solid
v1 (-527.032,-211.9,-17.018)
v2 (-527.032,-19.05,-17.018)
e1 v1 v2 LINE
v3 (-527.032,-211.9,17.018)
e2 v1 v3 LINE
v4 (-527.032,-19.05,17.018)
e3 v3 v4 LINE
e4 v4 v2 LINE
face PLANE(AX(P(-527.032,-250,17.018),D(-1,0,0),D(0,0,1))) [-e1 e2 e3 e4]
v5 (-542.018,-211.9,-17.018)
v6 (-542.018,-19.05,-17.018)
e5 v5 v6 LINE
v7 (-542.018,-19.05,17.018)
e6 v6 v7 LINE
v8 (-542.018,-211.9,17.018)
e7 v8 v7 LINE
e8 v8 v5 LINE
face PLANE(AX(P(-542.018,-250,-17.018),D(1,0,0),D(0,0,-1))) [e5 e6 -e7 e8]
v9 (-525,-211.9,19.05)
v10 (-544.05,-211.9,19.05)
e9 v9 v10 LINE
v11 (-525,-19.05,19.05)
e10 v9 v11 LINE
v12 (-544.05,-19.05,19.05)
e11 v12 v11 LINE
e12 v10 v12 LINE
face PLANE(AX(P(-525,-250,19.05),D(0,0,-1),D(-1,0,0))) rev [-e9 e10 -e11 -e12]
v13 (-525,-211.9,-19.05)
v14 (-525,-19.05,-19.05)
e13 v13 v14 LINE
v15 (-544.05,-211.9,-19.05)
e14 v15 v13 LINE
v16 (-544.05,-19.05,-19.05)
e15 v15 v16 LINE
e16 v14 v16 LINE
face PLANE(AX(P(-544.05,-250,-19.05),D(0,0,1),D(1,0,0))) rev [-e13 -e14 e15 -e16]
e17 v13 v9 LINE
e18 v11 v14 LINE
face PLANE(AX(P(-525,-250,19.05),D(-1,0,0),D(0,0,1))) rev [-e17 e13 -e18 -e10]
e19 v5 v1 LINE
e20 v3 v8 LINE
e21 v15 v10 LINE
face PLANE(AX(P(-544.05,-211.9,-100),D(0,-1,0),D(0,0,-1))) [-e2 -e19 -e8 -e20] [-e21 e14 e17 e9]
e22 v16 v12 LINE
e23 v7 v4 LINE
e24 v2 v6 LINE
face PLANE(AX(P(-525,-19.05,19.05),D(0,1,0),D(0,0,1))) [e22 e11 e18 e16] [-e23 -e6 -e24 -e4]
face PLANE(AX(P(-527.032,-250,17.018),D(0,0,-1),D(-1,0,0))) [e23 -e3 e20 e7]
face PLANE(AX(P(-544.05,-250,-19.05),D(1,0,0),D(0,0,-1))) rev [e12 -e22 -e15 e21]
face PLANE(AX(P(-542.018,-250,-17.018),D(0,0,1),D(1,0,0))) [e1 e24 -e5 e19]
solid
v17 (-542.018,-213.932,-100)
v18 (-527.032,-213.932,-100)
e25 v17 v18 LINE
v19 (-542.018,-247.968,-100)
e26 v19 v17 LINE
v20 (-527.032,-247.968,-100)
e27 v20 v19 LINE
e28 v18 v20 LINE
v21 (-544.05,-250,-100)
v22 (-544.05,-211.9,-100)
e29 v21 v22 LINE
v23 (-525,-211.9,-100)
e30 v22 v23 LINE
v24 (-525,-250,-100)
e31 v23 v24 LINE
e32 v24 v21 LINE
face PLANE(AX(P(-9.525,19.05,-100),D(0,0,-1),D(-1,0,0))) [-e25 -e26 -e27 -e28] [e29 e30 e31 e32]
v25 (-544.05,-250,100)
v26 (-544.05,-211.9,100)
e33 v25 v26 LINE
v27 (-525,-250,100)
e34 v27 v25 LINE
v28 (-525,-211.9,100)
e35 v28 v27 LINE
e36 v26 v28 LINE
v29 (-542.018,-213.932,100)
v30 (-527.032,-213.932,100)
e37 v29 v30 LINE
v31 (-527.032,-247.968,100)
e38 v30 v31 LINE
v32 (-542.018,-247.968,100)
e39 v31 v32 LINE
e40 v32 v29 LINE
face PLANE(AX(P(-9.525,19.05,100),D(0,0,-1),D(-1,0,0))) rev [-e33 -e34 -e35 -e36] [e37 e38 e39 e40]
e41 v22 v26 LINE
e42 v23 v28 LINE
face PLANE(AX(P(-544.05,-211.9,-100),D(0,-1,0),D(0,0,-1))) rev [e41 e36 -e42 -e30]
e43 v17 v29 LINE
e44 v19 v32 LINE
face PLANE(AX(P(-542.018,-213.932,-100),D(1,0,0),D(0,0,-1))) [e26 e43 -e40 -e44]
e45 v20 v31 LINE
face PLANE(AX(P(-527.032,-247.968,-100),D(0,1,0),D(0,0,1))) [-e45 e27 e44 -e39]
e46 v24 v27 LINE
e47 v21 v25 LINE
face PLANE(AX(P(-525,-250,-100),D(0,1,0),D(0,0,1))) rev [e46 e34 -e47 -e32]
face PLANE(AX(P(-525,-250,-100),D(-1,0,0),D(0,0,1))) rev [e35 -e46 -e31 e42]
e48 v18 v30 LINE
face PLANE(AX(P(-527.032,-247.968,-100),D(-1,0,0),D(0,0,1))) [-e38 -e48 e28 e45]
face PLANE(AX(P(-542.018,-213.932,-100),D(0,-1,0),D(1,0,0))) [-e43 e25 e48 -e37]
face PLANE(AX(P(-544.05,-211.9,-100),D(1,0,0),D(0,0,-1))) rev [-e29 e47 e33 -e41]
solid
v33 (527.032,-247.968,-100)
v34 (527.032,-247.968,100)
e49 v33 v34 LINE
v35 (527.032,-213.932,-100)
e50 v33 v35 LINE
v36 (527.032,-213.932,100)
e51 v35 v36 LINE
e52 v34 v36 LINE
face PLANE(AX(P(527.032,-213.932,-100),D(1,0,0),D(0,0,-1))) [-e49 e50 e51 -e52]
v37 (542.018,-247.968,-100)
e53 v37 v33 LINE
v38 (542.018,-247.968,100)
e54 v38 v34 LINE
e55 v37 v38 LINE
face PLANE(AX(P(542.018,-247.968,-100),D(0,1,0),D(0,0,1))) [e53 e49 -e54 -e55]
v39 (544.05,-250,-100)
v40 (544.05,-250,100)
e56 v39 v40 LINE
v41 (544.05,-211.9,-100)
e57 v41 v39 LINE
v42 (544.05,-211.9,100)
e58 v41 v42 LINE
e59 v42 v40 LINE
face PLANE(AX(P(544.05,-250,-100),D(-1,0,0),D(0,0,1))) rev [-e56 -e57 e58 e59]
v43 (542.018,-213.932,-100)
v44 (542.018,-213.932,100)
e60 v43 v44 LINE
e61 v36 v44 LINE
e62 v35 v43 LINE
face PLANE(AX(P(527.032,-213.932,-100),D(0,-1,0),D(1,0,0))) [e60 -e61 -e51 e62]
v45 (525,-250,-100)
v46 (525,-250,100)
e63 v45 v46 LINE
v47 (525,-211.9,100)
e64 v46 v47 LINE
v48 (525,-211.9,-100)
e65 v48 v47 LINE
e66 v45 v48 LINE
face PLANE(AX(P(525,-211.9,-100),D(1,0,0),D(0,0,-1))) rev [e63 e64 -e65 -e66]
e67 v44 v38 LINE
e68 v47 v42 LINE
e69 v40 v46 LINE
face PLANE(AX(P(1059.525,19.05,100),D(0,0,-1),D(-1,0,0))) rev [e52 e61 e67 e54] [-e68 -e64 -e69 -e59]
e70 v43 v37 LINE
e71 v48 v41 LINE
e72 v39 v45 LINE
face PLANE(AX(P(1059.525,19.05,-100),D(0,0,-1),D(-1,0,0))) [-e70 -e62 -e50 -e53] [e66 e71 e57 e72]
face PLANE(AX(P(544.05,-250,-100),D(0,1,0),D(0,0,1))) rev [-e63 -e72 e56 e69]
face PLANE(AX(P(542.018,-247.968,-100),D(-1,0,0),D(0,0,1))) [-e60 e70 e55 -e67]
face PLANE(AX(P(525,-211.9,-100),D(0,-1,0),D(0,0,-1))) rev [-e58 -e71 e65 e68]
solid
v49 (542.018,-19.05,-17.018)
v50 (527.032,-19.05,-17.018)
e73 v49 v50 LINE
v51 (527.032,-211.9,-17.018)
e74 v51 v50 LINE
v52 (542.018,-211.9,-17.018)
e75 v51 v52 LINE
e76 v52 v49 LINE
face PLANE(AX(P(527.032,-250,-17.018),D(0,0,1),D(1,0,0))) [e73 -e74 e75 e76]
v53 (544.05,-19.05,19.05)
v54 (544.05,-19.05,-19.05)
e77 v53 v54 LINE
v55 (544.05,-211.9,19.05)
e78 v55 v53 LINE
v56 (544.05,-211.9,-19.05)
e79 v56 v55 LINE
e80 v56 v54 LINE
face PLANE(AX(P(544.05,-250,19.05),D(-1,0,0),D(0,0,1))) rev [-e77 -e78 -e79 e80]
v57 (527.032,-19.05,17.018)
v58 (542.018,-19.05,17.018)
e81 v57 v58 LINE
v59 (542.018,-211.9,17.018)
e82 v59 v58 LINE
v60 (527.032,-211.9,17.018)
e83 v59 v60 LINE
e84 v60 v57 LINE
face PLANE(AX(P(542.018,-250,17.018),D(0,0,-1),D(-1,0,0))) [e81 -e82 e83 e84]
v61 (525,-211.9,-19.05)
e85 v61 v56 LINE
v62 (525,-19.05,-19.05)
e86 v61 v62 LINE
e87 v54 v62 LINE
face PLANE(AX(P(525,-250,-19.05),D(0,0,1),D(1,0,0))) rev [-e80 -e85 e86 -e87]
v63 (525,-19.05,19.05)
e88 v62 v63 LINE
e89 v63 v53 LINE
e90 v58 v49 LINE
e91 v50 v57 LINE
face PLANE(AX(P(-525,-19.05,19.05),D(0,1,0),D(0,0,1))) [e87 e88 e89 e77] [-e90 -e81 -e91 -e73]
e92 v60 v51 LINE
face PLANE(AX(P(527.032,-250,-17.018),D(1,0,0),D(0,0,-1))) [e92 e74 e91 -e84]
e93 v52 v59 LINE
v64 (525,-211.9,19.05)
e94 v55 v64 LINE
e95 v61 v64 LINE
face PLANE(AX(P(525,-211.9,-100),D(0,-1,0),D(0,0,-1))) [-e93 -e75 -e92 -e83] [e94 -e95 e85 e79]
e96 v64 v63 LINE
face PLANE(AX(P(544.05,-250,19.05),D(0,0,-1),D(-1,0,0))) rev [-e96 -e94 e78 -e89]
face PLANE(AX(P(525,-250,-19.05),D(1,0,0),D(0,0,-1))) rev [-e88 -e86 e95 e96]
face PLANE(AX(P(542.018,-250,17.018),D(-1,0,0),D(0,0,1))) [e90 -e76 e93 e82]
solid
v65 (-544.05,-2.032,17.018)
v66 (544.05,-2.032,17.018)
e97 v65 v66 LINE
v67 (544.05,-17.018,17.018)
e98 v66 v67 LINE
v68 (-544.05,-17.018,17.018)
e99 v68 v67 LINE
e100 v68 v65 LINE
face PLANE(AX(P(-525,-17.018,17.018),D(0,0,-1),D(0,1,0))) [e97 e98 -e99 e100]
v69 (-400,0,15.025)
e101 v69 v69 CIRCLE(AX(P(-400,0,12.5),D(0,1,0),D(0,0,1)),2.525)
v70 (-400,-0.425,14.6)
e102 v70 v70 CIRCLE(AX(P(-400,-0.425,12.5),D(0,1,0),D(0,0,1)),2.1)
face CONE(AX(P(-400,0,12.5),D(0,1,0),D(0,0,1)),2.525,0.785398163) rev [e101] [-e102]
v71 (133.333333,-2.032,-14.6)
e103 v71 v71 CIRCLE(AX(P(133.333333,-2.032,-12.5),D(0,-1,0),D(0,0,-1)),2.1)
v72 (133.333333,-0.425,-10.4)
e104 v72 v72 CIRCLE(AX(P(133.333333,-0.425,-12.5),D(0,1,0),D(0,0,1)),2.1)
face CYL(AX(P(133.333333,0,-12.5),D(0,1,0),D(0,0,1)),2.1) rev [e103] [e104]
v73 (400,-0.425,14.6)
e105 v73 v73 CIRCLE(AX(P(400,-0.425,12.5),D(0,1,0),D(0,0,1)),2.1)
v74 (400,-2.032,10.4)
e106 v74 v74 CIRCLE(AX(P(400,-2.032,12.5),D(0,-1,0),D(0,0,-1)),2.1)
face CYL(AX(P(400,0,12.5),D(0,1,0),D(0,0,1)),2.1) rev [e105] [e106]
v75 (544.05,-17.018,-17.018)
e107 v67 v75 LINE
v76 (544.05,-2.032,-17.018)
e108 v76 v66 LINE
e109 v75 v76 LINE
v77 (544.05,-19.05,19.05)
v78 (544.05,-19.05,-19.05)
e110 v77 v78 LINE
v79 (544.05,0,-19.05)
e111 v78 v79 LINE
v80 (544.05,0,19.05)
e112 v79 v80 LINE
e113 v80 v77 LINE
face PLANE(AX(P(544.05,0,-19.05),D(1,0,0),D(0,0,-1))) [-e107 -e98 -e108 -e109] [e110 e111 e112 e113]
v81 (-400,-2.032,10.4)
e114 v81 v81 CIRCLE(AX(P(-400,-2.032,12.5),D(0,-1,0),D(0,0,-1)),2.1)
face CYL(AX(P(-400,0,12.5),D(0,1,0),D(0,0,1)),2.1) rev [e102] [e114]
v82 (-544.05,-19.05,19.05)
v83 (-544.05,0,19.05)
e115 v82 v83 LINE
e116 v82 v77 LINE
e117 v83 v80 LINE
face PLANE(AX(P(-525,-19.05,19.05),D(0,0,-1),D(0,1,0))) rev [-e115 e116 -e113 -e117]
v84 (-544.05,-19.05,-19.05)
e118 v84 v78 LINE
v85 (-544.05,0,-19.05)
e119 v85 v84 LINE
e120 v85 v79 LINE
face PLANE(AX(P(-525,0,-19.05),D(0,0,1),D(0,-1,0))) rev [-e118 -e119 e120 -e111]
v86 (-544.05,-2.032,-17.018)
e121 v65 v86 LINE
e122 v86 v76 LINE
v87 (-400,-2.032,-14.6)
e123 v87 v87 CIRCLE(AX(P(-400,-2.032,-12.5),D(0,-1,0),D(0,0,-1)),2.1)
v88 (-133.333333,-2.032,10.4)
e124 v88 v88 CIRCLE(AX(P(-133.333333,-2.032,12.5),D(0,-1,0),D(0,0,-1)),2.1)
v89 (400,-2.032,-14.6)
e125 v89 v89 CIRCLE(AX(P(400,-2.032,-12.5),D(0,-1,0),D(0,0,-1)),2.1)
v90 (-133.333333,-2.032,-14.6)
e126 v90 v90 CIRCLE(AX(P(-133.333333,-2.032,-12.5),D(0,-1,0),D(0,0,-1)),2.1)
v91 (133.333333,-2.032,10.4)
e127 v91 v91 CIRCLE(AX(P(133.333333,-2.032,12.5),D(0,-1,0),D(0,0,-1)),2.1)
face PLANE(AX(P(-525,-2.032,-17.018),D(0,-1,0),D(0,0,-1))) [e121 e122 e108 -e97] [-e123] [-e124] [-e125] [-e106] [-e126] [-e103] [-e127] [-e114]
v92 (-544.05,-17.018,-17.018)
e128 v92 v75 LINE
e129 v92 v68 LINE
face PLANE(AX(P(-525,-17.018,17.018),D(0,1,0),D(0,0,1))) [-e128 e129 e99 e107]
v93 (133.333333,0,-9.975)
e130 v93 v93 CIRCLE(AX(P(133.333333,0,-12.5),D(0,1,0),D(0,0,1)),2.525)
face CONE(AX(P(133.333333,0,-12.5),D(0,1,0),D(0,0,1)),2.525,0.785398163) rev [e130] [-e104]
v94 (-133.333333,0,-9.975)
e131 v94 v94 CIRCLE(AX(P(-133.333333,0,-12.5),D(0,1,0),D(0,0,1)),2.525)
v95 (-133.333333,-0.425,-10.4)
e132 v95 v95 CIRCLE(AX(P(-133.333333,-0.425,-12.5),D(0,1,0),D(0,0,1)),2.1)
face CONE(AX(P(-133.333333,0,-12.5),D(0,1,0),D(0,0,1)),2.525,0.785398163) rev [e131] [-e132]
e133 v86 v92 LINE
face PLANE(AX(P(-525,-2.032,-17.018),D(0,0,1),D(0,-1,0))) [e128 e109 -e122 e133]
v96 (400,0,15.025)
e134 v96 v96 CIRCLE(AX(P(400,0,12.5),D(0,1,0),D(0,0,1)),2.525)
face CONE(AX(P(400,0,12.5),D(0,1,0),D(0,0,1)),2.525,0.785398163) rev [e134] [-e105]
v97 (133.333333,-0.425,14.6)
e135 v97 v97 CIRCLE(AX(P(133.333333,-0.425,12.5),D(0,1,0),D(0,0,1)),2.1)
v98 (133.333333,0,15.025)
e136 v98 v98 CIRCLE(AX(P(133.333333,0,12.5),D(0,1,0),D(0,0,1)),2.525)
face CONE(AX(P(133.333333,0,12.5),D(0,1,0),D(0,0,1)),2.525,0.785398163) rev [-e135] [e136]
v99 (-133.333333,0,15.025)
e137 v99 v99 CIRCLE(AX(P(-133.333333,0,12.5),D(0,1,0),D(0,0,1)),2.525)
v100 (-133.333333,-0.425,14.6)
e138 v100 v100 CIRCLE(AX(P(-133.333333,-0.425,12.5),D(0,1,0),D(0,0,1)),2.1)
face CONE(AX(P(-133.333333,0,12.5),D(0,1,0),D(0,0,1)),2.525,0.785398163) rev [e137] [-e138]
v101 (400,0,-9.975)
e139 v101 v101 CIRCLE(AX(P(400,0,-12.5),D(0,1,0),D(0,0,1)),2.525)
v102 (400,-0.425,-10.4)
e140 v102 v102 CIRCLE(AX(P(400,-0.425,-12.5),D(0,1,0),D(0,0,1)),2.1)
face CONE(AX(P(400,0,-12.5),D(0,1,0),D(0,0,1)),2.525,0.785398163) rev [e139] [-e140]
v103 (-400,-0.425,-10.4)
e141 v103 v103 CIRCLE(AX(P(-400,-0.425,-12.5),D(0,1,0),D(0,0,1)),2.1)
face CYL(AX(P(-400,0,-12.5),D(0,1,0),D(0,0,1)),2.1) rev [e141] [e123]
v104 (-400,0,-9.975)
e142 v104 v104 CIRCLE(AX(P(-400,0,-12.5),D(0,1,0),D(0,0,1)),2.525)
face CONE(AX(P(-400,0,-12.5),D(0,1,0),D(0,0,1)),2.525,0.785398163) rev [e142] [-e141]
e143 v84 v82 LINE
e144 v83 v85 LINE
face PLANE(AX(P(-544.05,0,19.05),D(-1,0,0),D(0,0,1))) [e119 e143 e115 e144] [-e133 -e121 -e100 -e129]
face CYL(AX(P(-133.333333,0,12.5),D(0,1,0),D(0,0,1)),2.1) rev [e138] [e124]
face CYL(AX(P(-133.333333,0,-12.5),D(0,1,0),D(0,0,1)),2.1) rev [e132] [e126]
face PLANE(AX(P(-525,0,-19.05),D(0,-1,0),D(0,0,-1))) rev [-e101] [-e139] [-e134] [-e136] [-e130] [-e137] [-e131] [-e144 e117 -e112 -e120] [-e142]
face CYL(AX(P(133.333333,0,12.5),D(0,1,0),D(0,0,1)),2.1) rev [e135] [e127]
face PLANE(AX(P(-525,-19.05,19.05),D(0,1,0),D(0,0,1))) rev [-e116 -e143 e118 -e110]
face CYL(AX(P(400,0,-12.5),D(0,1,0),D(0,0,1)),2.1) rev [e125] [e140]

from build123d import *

# Parameters (mm, degrees)
AL_START                                       = -544.05
AL_TUBE_RECTANGULAR_AL_TUBE_3_X_1_5_2_W        = 192.85
AL_TUBE_RECTANGULAR_AL_TUBE_3_X_1_5_2_H        = 38.1
AL_TUBE_RECTANGULAR_AL_TUBE_3_X_1_5_RECT_DEPTH = 2.032
AL_START_2                                     = -527.032
AL_TUBE_RECTANGULAR_AL_TUBE_3_X_1_5_3_OU_W     = 192.85
AL_TUBE_RECTANGULAR_AL_TUBE_3_X_1_5_3_OU_H     = 38.1
AL_TUBE_RECTANGULAR_AL_TUBE_3_X_1_5_3_DEPTH    = 2.032
AL_START_3                                     = -542.018
AL_TUBE_RECTANGULAR_AL_TUBE_3_X_1_5_4_OU_W     = 192.85
AL_TUBE_RECTANGULAR_AL_TUBE_3_X_1_5_4_OU_H     = 2.032
AL_TUBE_RECTANGULAR_AL_TUBE_3_X_1_5_4_DEPTH    = 14.986
AL_START_4                                     = -19.05
AL_TUBE_RECTANGULAR_AL_TUBE_3_X_1_5_5_OU_W     = 1088.1
AL_TUBE_RECTANGULAR_AL_TUBE_3_X_1_5_5_OU_H     = 38.1
AL_TUBE_RECTANGULAR_AL_TUBE_3_X_1_5_5_DEPTH    = 2.032
AL_START_5                                     = -2.032
AL_TUBE_RECTANGULAR_AL_TUBE_3_X_1_5_6_OU_W     = 1088.1
AL_TUBE_RECTANGULAR_AL_TUBE_3_X_1_5_6_OU_H     = 38.1
AL_TUBE_RECTANGULAR_AL_TUBE_3_X_1_5_6_DEPTH    = 2.032
AL_START_6                                     = -17.018
AL_TUBE_RECTANGULAR_AL_TUBE_3_X_1_5_7_OU_W     = 1088.1
AL_TUBE_RECTANGULAR_AL_TUBE_3_X_1_5_7_OU_H     = 2.032
AL_TUBE_RECTANGULAR_AL_TUBE_3_X_1_5_7_DEPTH    = 14.986
AL_START_7                                     = 525
AL_TUBE_RECTANGULAR_AL_TUBE_3_X_1_5_8_OU_W     = 192.85
AL_TUBE_RECTANGULAR_AL_TUBE_3_X_1_5_8_OU_H     = 38.1
AL_TUBE_RECTANGULAR_AL_TUBE_3_X_1_5_8_DEPTH    = 2.032
AL_START_8                                     = 542.018
AL_TUBE_RECTANGULAR_AL_TUBE_3_X_1_5_9_OU_W     = 192.85
AL_TUBE_RECTANGULAR_AL_TUBE_3_X_1_5_9_OU_H     = 38.1
AL_TUBE_RECTANGULAR_AL_TUBE_3_X_1_5_9_DEPTH    = 2.032
AL_START_9                                     = 527.032
AL_TUBE_RECTANGULAR_AL_TUBE_3_X_1_5_10_O_W     = 192.85
AL_TUBE_RECTANGULAR_AL_TUBE_3_X_1_5_10_O_H     = 2.032
AL_TUBE_RECTANGULAR_AL_TUBE_3_X_1_5_10_DEPTH   = 14.986
AL_TUBE_RECTANGULAR_AL_TUBE_3_X_1_5_11_O_W     = 38.1
AL_TUBE_RECTANGULAR_AL_TUBE_3_X_1_5_11_O_H     = 200
AL_TUBE_RECTANGULAR_AL_TUBE_3_X_1_5_11_DEPTH   = 2.032
AL_TUBE_RECTANGULAR_AL_TUBE_3_X_1_5_12_O_W     = 38.1
AL_TUBE_RECTANGULAR_AL_TUBE_3_X_1_5_12_O_H     = 200
AL_TUBE_RECTANGULAR_AL_TUBE_3_X_1_5_12_DEPTH   = 2.032
AL_TUBE_RECTANGULAR_AL_TUBE_3_X_1_5_13_O_W     = 2.032
AL_TUBE_RECTANGULAR_AL_TUBE_3_X_1_5_13_O_H     = 200
AL_TUBE_RECTANGULAR_AL_TUBE_3_X_1_5_13_DEPTH   = 14.986
AL_TUBE_RECTANGULAR_AL_TUBE_3_X_1_5_14_O_W     = 38.1
AL_TUBE_RECTANGULAR_AL_TUBE_3_X_1_5_14_O_H     = 200
AL_TUBE_RECTANGULAR_AL_TUBE_3_X_1_5_14_DEPTH   = 2.032
AL_TUBE_RECTANGULAR_AL_TUBE_3_X_1_5_15_O_W     = 38.1
AL_TUBE_RECTANGULAR_AL_TUBE_3_X_1_5_15_O_H     = 200
AL_TUBE_RECTANGULAR_AL_TUBE_3_X_1_5_15_DEPTH   = 2.032
AL_TUBE_RECTANGULAR_AL_TUBE_3_X_1_5_16_O_W     = 2.032
AL_TUBE_RECTANGULAR_AL_TUBE_3_X_1_5_16_O_H     = 200
AL_TUBE_RECTANGULAR_AL_TUBE_3_X_1_5_16_DEPTH   = 14.986
TROU_TARAUD_M5X0_81_AT_2_COUNT                 = 2
TROU_TARAUD_M5X0_81_AT_2_PITCH                 = 800
TROU_TARAUD_M5X0_81_AT_3_COUNT                 = 2
TROU_TARAUD_M5X0_81_AT_3_PITCH                 = 800.390529679
TROU_TARAUD_M5X0_81_AT_4_COUNT                 = 2
TROU_TARAUD_M5X0_81_AT_4_PITCH                 = 533.918949321
TROU_TARAUD_M5X0_81_AT_5_COUNT                 = 2
TROU_TARAUD_M5X0_81_AT_5_PITCH                 = 533.333333333
TROU_TARAUD_M5X0_81_AT_6_COUNT                 = 2
TROU_TARAUD_M5X0_81_AT_6_PITCH                 = 266.666666667
TROU_TARAUD_M5X0_81_AT_7_COUNT                 = 2
TROU_TARAUD_M5X0_81_AT_7_PITCH                 = 267.835978
TROU_TARAUD_M5X0_81_AT_8_COUNT                 = 2
TROU_TARAUD_M5X0_81_AT_8_PITCH                 = 25


# Read off the part's stored shape, not the designer's step: Al tube rectangular AL TUBE 3 X 1.5 RECT X 0.104 WALL(4)
with BuildPart() as part:
    # Al tube rectangular AL TUBE 3 X 1.5  2 → Al tube rectangular AL TUBE 3 X 1.5 RECT X 0.104 WALL(4) (new body)
    with BuildSketch(Plane.YZ.offset(AL_START)):
        with Locations((-115.475, 0)):
            Rectangle(AL_TUBE_RECTANGULAR_AL_TUBE_3_X_1_5_2_W, AL_TUBE_RECTANGULAR_AL_TUBE_3_X_1_5_2_H)
    extrude(amount=AL_TUBE_RECTANGULAR_AL_TUBE_3_X_1_5_RECT_DEPTH)

    # Al tube rectangular AL TUBE 3 X 1.5 3 ou → Al tube rectangular AL TUBE 3 X 1.5  3 (add)
    with BuildSketch(Plane.YZ.offset(AL_START_2)):
        with Locations((-115.475, 0)):
            Rectangle(AL_TUBE_RECTANGULAR_AL_TUBE_3_X_1_5_3_OU_W, AL_TUBE_RECTANGULAR_AL_TUBE_3_X_1_5_3_OU_H)
    extrude(amount=AL_TUBE_RECTANGULAR_AL_TUBE_3_X_1_5_3_DEPTH)

    # Al tube rectangular AL TUBE 3 X 1.5 4 ou → Al tube rectangular AL TUBE 3 X 1.5  4 (add)
    with BuildSketch(Plane.YZ.offset(AL_START_3)):
        with Locations((-115.475, 18.034)):
            Rectangle(AL_TUBE_RECTANGULAR_AL_TUBE_3_X_1_5_4_OU_W, AL_TUBE_RECTANGULAR_AL_TUBE_3_X_1_5_4_OU_H)
        with Locations((-115.475, -18.034)):
            Rectangle(AL_TUBE_RECTANGULAR_AL_TUBE_3_X_1_5_4_OU_W, AL_TUBE_RECTANGULAR_AL_TUBE_3_X_1_5_4_OU_H)
    extrude(amount=AL_TUBE_RECTANGULAR_AL_TUBE_3_X_1_5_4_DEPTH)


with BuildPart() as body_2:
    # Al tube rectangular AL TUBE 3 X 1.5 5 ou → Al tube rectangular AL TUBE 3 X 1.5  5 (new body)
    with BuildSketch(Plane(origin=(0, 0, 0), x_dir=(1, 0, 0), z_dir=(0, 1, 0)).offset(AL_START_4)):
        Rectangle(AL_TUBE_RECTANGULAR_AL_TUBE_3_X_1_5_5_OU_W, AL_TUBE_RECTANGULAR_AL_TUBE_3_X_1_5_5_OU_H)
    extrude(amount=AL_TUBE_RECTANGULAR_AL_TUBE_3_X_1_5_5_DEPTH)

    # Al tube rectangular AL TUBE 3 X 1.5 6 ou → Al tube rectangular AL TUBE 3 X 1.5  6 (add)
    with BuildSketch(Plane(origin=(0, 0, 0), x_dir=(1, 0, 0), z_dir=(0, 1, 0)).offset(AL_START_5)):
        Rectangle(AL_TUBE_RECTANGULAR_AL_TUBE_3_X_1_5_6_OU_W, AL_TUBE_RECTANGULAR_AL_TUBE_3_X_1_5_6_OU_H)
    extrude(amount=AL_TUBE_RECTANGULAR_AL_TUBE_3_X_1_5_6_DEPTH)

    # Al tube rectangular AL TUBE 3 X 1.5 7 ou → Al tube rectangular AL TUBE 3 X 1.5  7 (add)
    with BuildSketch(Plane(origin=(0, 0, 0), x_dir=(1, 0, 0), z_dir=(0, 1, 0)).offset(AL_START_6)):
        with Locations((0, 18.034)):
            Rectangle(AL_TUBE_RECTANGULAR_AL_TUBE_3_X_1_5_7_OU_W, AL_TUBE_RECTANGULAR_AL_TUBE_3_X_1_5_7_OU_H)
        with Locations((0, -18.034)):
            Rectangle(AL_TUBE_RECTANGULAR_AL_TUBE_3_X_1_5_7_OU_W, AL_TUBE_RECTANGULAR_AL_TUBE_3_X_1_5_7_OU_H)
    extrude(amount=AL_TUBE_RECTANGULAR_AL_TUBE_3_X_1_5_7_DEPTH)

    # Esquisse2 → Trou taraudé M5x0.81 (revolve, cut)
    with BuildSketch(Plane(origin=(400, 0, -12.5), x_dir=(0, 0, 1), z_dir=(1, 0, 0))):
        Polygon((0, 0), (0, 2.033), (2.1, 2.033), (2.1, 0.425), (2.525, 0), align=None)
    trou_taraud_m5x0_81 = revolve(axis=Axis((400, 6.35, -12.5), (0, -1, 0)), mode=Mode.SUBTRACT)

    # Trou taraudé M5x0.81 at 2: Trou taraudé M5x0.81 ×2
    with Locations(*[(-i * TROU_TARAUD_M5X0_81_AT_2_PITCH, 0, 0) for i in range(1, TROU_TARAUD_M5X0_81_AT_2_COUNT)]):
        add(trou_taraud_m5x0_81, mode=Mode.SUBTRACT)

    # Trou taraudé M5x0.81 at 3: Trou taraudé M5x0.81 ×2
    with Locations(*[Vector(-0.9995120760870788, 0, 0.031234752377721213) * (i * TROU_TARAUD_M5X0_81_AT_3_PITCH) for i in range(1, TROU_TARAUD_M5X0_81_AT_3_COUNT)]):
        add(trou_taraud_m5x0_81, mode=Mode.SUBTRACT)

    # Trou taraudé M5x0.81 at 4: Trou taraudé M5x0.81 ×2
    with Locations(*[Vector(-0.998903174369838, 0, 0.04682358629858615) * (i * TROU_TARAUD_M5X0_81_AT_4_PITCH) for i in range(1, TROU_TARAUD_M5X0_81_AT_4_COUNT)]):
        add(trou_taraud_m5x0_81, mode=Mode.SUBTRACT)

    # Trou taraudé M5x0.81 at 5: Trou taraudé M5x0.81 ×2
    with Locations(*[(-i * TROU_TARAUD_M5X0_81_AT_5_PITCH, 0, 0) for i in range(1, TROU_TARAUD_M5X0_81_AT_5_COUNT)]):
        add(trou_taraud_m5x0_81, mode=Mode.SUBTRACT)

    # Trou taraudé M5x0.81 at 6: Trou taraudé M5x0.81 ×2
    with Locations(*[(-i * TROU_TARAUD_M5X0_81_AT_6_PITCH, 0, 0) for i in range(1, TROU_TARAUD_M5X0_81_AT_6_COUNT)]):
        add(trou_taraud_m5x0_81, mode=Mode.SUBTRACT)

    # Trou taraudé M5x0.81 at 7: Trou taraudé M5x0.81 ×2
    with Locations(*[Vector(-0.9956342260592882, 0, 0.09334070869305829) * (i * TROU_TARAUD_M5X0_81_AT_7_PITCH) for i in range(1, TROU_TARAUD_M5X0_81_AT_7_COUNT)]):
        add(trou_taraud_m5x0_81, mode=Mode.SUBTRACT)

    # Trou taraudé M5x0.81 at 8: Trou taraudé M5x0.81 ×2
    with Locations(*[(0, 0, i * TROU_TARAUD_M5X0_81_AT_8_PITCH) for i in range(1, TROU_TARAUD_M5X0_81_AT_8_COUNT)]):
        add(trou_taraud_m5x0_81, mode=Mode.SUBTRACT)


with BuildPart() as body_3:
    # Al tube rectangular AL TUBE 3 X 1.5 8 ou → Al tube rectangular AL TUBE 3 X 1.5  8 (new body)
    with BuildSketch(Plane.YZ.offset(AL_START_7)):
        with Locations((-115.475, 0)):
            Rectangle(AL_TUBE_RECTANGULAR_AL_TUBE_3_X_1_5_8_OU_W, AL_TUBE_RECTANGULAR_AL_TUBE_3_X_1_5_8_OU_H)
    extrude(amount=AL_TUBE_RECTANGULAR_AL_TUBE_3_X_1_5_8_DEPTH)

    # Al tube rectangular AL TUBE 3 X 1.5 9 ou → Al tube rectangular AL TUBE 3 X 1.5  9 (add)
    with BuildSketch(Plane.YZ.offset(AL_START_8)):
        with Locations((-115.475, 0)):
            Rectangle(AL_TUBE_RECTANGULAR_AL_TUBE_3_X_1_5_9_OU_W, AL_TUBE_RECTANGULAR_AL_TUBE_3_X_1_5_9_OU_H)
    extrude(amount=AL_TUBE_RECTANGULAR_AL_TUBE_3_X_1_5_9_DEPTH)

    # Al tube rectangular AL TUBE 3 X 1.5 10 o → Al tube rectangular AL TUBE 3 X 1.5  10 (add)
    with BuildSketch(Plane.YZ.offset(AL_START_9)):
        with Locations((-115.475, 18.034)):
            Rectangle(AL_TUBE_RECTANGULAR_AL_TUBE_3_X_1_5_10_O_W, AL_TUBE_RECTANGULAR_AL_TUBE_3_X_1_5_10_O_H)
        with Locations((-115.475, -18.034)):
            Rectangle(AL_TUBE_RECTANGULAR_AL_TUBE_3_X_1_5_10_O_W, AL_TUBE_RECTANGULAR_AL_TUBE_3_X_1_5_10_O_H)
    extrude(amount=AL_TUBE_RECTANGULAR_AL_TUBE_3_X_1_5_10_DEPTH)


with BuildPart() as body_4:
    # Al tube rectangular AL TUBE 3 X 1.5 11 o → Al tube rectangular AL TUBE 3 X 1.5  11 (new body)
    with BuildSketch(Plane.YZ.offset(AL_START_7)):
        with Locations((-230.95, 0)):
            Rectangle(AL_TUBE_RECTANGULAR_AL_TUBE_3_X_1_5_11_O_W, AL_TUBE_RECTANGULAR_AL_TUBE_3_X_1_5_11_O_H)
    extrude(amount=AL_TUBE_RECTANGULAR_AL_TUBE_3_X_1_5_11_DEPTH)

    # Al tube rectangular AL TUBE 3 X 1.5 12 o → Al tube rectangular AL TUBE 3 X 1.5  12 (add)
    with BuildSketch(Plane.YZ.offset(AL_START_8)):
        with Locations((-230.95, 0)):
            Rectangle(AL_TUBE_RECTANGULAR_AL_TUBE_3_X_1_5_12_O_W, AL_TUBE_RECTANGULAR_AL_TUBE_3_X_1_5_12_O_H)
    extrude(amount=AL_TUBE_RECTANGULAR_AL_TUBE_3_X_1_5_12_DEPTH)

    # Al tube rectangular AL TUBE 3 X 1.5 13 o → Al tube rectangular AL TUBE 3 X 1.5  13 (add)
    with BuildSketch(Plane.YZ.offset(AL_START_9)):
        with Locations((-248.984, 0)):
            Rectangle(AL_TUBE_RECTANGULAR_AL_TUBE_3_X_1_5_13_O_W, AL_TUBE_RECTANGULAR_AL_TUBE_3_X_1_5_13_O_H)
        with Locations((-212.916, 0)):
            Rectangle(AL_TUBE_RECTANGULAR_AL_TUBE_3_X_1_5_13_O_W, AL_TUBE_RECTANGULAR_AL_TUBE_3_X_1_5_13_O_H)
    extrude(amount=AL_TUBE_RECTANGULAR_AL_TUBE_3_X_1_5_13_DEPTH)


with BuildPart() as body_5:
    # Al tube rectangular AL TUBE 3 X 1.5 14 o → Al tube rectangular AL TUBE 3 X 1.5  14 (new body)
    with BuildSketch(Plane.YZ.offset(AL_START)):
        with Locations((-230.95, 0)):
            Rectangle(AL_TUBE_RECTANGULAR_AL_TUBE_3_X_1_5_14_O_W, AL_TUBE_RECTANGULAR_AL_TUBE_3_X_1_5_14_O_H)
    extrude(amount=AL_TUBE_RECTANGULAR_AL_TUBE_3_X_1_5_14_DEPTH)

    # Al tube rectangular AL TUBE 3 X 1.5 15 o → Al tube rectangular AL TUBE 3 X 1.5  15 (add)
    with BuildSketch(Plane.YZ.offset(AL_START_2)):
        with Locations((-230.95, 0)):
            Rectangle(AL_TUBE_RECTANGULAR_AL_TUBE_3_X_1_5_15_O_W, AL_TUBE_RECTANGULAR_AL_TUBE_3_X_1_5_15_O_H)
    extrude(amount=AL_TUBE_RECTANGULAR_AL_TUBE_3_X_1_5_15_DEPTH)

    # Al tube rectangular AL TUBE 3 X 1.5 16 o → Al tube rectangular AL TUBE 3 X 1.5  16 (add)
    with BuildSketch(Plane.YZ.offset(AL_START_3)):
        with Locations((-248.984, 0)):
            Rectangle(AL_TUBE_RECTANGULAR_AL_TUBE_3_X_1_5_16_O_W, AL_TUBE_RECTANGULAR_AL_TUBE_3_X_1_5_16_O_H)
        with Locations((-212.916, 0)):
            Rectangle(AL_TUBE_RECTANGULAR_AL_TUBE_3_X_1_5_16_O_W, AL_TUBE_RECTANGULAR_AL_TUBE_3_X_1_5_16_O_H)
    extrude(amount=AL_TUBE_RECTANGULAR_AL_TUBE_3_X_1_5_16_DEPTH)


solid = Compound([part.part, body_2.part, body_3.part, body_4.part, body_5.part])
